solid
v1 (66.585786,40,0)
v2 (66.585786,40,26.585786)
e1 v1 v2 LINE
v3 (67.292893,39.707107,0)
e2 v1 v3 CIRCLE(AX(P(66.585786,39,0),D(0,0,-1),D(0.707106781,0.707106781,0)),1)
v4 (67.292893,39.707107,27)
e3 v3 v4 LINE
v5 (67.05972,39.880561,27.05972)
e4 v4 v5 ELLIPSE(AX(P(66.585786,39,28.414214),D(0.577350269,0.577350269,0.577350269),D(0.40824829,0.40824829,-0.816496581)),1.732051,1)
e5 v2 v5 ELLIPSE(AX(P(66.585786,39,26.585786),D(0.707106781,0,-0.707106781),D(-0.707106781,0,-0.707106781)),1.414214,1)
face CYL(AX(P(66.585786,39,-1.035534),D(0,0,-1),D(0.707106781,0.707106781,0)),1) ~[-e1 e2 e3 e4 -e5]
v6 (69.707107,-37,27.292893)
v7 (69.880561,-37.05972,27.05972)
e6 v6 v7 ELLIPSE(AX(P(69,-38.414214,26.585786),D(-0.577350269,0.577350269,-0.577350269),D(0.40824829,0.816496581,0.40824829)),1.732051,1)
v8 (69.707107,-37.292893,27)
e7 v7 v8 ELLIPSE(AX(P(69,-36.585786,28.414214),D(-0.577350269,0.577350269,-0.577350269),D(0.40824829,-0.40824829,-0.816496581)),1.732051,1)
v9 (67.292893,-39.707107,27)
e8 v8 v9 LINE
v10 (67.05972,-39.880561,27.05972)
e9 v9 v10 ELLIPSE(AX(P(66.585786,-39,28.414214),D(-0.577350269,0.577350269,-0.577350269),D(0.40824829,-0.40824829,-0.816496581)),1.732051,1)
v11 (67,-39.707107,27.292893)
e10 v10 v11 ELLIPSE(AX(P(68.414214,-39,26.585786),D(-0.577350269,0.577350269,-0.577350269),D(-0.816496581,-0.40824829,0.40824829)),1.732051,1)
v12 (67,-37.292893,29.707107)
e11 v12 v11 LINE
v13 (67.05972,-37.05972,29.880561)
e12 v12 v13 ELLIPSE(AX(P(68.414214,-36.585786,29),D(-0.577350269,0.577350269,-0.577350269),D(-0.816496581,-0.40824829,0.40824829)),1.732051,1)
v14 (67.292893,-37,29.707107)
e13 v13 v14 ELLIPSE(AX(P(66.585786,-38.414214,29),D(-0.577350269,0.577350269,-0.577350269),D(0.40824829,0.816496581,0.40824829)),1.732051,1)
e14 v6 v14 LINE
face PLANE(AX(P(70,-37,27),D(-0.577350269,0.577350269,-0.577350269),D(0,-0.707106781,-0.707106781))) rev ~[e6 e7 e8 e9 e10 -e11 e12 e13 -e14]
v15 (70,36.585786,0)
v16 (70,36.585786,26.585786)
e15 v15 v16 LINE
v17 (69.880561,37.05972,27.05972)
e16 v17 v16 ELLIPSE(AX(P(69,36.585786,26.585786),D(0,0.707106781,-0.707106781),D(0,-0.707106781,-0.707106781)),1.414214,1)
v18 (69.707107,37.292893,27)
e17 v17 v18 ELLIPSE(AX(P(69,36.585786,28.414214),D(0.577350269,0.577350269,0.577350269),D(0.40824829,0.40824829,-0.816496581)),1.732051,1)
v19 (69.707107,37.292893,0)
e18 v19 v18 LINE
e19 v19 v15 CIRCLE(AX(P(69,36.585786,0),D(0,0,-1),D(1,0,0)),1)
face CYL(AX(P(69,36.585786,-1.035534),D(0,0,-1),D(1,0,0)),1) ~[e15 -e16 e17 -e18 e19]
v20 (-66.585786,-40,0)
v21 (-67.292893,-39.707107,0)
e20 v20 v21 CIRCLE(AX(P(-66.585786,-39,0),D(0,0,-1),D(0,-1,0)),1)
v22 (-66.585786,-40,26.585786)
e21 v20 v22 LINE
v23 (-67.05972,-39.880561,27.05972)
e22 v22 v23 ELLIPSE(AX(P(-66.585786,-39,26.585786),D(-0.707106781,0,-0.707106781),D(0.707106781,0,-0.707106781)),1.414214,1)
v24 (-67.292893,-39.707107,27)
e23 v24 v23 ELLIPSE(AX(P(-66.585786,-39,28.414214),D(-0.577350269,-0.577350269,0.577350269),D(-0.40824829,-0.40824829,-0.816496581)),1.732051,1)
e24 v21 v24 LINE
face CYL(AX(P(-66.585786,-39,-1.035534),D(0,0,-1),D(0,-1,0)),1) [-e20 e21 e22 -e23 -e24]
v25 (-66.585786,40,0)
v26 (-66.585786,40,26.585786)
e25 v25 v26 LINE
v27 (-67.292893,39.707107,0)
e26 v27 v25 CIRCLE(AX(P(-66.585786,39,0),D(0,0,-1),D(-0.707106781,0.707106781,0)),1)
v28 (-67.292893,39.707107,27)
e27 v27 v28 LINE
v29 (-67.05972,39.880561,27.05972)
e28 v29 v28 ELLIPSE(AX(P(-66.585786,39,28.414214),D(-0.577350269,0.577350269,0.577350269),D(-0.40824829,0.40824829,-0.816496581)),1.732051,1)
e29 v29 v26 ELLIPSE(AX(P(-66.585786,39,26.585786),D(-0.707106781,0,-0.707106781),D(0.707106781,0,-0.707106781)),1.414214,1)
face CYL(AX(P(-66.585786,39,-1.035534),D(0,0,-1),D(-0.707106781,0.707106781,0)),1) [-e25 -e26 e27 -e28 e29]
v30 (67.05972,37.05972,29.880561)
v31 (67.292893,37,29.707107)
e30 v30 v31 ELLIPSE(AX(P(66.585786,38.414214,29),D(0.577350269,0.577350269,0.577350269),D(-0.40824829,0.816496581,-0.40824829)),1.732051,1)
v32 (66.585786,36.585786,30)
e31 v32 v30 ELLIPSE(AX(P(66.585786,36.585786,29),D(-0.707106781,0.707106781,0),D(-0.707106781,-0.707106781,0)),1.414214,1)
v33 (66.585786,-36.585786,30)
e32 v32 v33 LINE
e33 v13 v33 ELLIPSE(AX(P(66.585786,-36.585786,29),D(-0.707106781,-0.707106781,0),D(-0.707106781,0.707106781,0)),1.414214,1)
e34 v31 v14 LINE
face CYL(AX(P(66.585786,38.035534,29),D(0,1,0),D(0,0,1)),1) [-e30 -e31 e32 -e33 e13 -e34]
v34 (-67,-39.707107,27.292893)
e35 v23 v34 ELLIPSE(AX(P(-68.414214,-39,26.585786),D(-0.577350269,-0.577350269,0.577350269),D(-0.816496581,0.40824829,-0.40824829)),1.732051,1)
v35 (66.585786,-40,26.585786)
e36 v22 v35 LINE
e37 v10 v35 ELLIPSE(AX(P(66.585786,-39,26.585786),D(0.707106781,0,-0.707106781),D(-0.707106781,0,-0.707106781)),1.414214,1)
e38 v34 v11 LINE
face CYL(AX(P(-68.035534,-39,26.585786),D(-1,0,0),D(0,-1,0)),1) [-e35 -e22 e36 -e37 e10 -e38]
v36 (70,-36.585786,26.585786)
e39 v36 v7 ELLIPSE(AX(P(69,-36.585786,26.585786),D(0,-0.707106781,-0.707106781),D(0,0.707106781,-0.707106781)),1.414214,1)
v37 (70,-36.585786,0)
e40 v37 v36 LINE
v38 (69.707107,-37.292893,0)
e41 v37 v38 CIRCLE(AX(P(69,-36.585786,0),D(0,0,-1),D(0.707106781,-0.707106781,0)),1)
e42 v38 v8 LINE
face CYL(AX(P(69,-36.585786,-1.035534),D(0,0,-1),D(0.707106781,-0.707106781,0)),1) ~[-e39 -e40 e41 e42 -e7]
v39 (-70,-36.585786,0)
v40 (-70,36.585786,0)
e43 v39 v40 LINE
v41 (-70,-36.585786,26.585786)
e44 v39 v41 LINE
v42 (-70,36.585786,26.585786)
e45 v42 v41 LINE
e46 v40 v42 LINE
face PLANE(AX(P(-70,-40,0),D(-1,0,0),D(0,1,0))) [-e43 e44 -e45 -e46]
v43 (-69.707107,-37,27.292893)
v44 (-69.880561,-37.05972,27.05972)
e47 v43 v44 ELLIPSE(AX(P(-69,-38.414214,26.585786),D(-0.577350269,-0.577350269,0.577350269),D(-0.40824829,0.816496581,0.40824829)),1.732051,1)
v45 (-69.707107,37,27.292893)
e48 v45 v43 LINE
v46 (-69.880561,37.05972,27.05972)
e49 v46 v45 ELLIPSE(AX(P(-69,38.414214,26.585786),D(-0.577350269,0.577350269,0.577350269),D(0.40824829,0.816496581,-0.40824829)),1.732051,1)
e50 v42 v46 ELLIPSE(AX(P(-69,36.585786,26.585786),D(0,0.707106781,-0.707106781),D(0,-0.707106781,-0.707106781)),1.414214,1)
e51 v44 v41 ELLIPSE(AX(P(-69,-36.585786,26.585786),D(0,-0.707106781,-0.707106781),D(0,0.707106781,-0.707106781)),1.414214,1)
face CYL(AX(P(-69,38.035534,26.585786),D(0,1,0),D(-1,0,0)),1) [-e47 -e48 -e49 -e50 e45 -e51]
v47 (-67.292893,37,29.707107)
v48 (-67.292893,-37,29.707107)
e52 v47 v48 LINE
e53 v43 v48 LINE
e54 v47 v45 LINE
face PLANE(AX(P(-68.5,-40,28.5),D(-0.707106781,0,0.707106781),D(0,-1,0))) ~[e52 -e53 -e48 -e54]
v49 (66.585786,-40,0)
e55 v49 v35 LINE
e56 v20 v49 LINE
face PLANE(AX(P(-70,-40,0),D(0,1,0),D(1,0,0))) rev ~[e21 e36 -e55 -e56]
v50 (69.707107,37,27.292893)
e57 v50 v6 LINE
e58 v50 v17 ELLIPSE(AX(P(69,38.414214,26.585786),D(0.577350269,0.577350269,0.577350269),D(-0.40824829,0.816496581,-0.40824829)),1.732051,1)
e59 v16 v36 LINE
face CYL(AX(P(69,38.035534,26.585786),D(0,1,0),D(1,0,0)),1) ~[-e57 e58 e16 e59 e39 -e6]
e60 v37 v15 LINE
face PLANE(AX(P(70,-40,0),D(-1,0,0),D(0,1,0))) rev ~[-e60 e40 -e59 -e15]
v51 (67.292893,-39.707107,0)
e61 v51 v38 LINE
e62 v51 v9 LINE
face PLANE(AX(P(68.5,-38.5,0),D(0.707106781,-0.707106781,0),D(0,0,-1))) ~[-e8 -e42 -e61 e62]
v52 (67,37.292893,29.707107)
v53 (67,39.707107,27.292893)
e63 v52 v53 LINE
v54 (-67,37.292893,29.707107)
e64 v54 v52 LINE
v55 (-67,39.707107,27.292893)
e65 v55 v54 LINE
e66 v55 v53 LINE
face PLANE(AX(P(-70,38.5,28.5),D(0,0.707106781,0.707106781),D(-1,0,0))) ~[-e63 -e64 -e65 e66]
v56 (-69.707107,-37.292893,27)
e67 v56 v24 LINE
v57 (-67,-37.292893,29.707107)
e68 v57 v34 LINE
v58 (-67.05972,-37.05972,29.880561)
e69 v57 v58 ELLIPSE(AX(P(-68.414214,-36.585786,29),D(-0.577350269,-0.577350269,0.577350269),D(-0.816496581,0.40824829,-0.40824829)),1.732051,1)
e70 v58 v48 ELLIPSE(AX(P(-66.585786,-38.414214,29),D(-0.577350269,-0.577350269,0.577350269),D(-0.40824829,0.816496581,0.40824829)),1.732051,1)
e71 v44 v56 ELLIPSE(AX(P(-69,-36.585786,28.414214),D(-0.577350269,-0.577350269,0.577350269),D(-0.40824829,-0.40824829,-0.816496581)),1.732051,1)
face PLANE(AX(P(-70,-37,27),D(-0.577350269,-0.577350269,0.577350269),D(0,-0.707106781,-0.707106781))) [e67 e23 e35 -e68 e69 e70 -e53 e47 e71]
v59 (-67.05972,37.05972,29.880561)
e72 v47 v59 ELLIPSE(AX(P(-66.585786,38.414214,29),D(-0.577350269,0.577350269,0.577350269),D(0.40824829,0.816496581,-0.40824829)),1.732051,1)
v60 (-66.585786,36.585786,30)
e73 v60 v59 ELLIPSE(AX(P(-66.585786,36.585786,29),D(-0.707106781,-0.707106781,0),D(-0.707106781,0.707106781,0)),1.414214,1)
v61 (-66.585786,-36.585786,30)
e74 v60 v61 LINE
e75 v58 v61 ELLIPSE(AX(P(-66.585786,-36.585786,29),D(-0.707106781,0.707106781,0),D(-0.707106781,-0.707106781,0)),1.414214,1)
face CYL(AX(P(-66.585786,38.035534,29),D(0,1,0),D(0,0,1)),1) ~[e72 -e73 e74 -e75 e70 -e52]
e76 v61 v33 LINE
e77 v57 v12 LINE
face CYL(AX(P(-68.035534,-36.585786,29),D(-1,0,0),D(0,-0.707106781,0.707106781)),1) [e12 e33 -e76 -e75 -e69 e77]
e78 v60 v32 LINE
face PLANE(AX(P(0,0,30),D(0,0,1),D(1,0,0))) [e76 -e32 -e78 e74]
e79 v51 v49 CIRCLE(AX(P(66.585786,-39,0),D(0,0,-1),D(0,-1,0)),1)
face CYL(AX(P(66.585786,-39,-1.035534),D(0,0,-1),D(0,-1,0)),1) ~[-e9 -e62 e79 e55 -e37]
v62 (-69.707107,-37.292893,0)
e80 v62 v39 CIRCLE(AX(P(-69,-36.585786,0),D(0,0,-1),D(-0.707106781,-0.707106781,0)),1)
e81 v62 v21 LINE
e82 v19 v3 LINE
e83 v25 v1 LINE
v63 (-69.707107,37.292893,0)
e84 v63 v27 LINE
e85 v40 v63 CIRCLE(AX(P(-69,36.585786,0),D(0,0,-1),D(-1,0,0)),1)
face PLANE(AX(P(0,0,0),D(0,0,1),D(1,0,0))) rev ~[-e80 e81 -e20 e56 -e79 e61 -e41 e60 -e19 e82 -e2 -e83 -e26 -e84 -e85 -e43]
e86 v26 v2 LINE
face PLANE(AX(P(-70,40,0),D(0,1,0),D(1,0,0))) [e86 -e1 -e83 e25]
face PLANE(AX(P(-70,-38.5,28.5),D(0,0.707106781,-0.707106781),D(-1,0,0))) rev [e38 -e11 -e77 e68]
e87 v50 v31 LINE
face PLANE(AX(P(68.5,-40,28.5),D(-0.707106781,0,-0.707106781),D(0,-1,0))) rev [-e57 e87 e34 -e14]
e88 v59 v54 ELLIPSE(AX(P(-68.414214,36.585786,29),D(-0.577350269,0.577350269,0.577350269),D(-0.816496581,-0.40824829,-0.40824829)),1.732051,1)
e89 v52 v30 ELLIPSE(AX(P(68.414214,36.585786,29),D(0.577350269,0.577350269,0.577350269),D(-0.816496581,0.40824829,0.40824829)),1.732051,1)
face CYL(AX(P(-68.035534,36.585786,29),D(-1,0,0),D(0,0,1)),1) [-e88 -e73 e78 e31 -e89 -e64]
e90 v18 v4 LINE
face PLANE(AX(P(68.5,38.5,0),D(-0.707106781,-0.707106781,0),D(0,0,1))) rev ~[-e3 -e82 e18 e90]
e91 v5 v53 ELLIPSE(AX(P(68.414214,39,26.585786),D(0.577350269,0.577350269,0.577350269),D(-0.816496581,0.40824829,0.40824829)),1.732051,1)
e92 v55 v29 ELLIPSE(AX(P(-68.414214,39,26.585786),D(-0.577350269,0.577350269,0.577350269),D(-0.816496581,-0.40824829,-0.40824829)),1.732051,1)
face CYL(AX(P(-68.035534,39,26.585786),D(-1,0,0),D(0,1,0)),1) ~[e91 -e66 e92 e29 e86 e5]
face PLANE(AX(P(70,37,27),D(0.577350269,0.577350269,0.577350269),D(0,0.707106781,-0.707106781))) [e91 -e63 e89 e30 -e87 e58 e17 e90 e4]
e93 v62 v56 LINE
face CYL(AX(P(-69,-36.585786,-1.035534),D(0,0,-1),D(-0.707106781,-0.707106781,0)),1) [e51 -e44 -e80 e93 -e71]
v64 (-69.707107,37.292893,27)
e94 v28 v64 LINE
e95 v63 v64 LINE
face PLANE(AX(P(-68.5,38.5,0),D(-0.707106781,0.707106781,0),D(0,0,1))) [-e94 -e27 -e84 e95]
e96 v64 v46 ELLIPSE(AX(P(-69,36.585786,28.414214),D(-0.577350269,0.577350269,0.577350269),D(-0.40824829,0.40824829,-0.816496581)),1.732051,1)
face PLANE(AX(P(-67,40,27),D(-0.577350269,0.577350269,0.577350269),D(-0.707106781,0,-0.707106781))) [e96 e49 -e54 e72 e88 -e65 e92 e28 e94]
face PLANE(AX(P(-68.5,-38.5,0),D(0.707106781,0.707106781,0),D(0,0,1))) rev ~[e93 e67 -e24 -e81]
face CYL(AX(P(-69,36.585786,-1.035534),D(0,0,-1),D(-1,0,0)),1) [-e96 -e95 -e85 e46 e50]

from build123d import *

# Parameters (mm, degrees)
F0_W        = 140
F0_H        = 80
F1_DEPTH    = 30
F2_SIZE     = 3
F3_T1_DEPTH = 29.0710678119
F3_T3_DEPTH = 136.0710678119
F3_T5_DEPTH = 76.0710678119


# Not quite as in the source:
# - a fillet or chamfer that OpenCascade refuses, or shapes differently, is made with other operations: its cross-section is extruded or revolved along the edge and cut away or added


with BuildPart() as f1:
    # F0 (on Top) → F1 (new body)
    with BuildSketch(Plane.XY):
        Rectangle(F0_W, F0_H)
    extrude(amount=F1_DEPTH)

    # F2
    f2_edges = [f1.edges().sort_by_distance(p)[0] for p in [
        (0, -40, 30),
        (-70, 0, 30),
        (0, 40, 30),
        (70, 0, 30),
        (70, -40, 15),
        (-70, -40, 15),
        (-70, 40, 15),
        (70, 40, 15),
    ]]
    chamfer(f2_edges, length=F2_SIZE)

    # F3: fillet of radius 1 on 16 edges, made by hand

    # F3_s2 → F3_t1 (cut)
    with BuildSketch(Plane.XY.offset(-1.0355339059)):
        with BuildLine():
            ThreePointArc((70, 36.5857864376), (69.9238795325, 36.96846987), (69.7071067812, 37.2928932188))
            Line((69.7071067812, 37.2928932188), (70, 37))
            Line((70, 37), (70, 36.5857864376))
        make_face()
        with BuildLine():
            ThreePointArc((67.2928932188, 39.7071067812), (66.96846987, 39.9238795325), (66.5857864376, 40))
            Line((66.5857864376, 40), (67, 40))
            Line((67, 40), (67.2928932188, 39.7071067812))
        make_face()
        with BuildLine():
            ThreePointArc((-67.2928932188, 39.7071067812), (-66.96846987, 39.9238795325), (-66.5857864376, 40))
            Line((-66.5857864376, 40), (-67, 40))
            Line((-67, 40), (-67.2928932188, 39.7071067812))
        make_face()
        with BuildLine():
            ThreePointArc((-70, 36.5857864376), (-69.9238795325, 36.96846987), (-69.7071067812, 37.2928932188))
            Line((-69.7071067812, 37.2928932188), (-70, 37))
            Line((-70, 37), (-70, 36.5857864376))
        make_face()
        with BuildLine():
            ThreePointArc((69.7071067812, -37.2928932188), (69.9238795325, -36.96846987), (70, -36.5857864376))
            Line((70, -36.5857864376), (70, -37))
            Line((70, -37), (69.7071067812, -37.2928932188))
        make_face()
        with BuildLine():
            ThreePointArc((66.5857864376, -40), (66.96846987, -39.9238795325), (67.2928932188, -39.7071067812))
            Line((67.2928932188, -39.7071067812), (67, -40))
            Line((67, -40), (66.5857864376, -40))
        make_face()
        with BuildLine():
            ThreePointArc((-69.7071067812, -37.2928932188), (-69.9238795325, -36.96846987), (-70, -36.5857864376))
            Line((-70, -36.5857864376), (-70, -37))
            Line((-70, -37), (-69.7071067812, -37.2928932188))
        make_face()
        with BuildLine():
            ThreePointArc((-66.5857864376, -40), (-66.96846987, -39.9238795325), (-67.2928932188, -39.7071067812))
            Line((-67.2928932188, -39.7071067812), (-67, -40))
            Line((-67, -40), (-66.5857864376, -40))
        make_face()
    extrude(amount=F3_T1_DEPTH, mode=Mode.SUBTRACT)

    # F3_s4 → F3_t3 (cut)
    with BuildSketch(Plane.YZ.offset(-68.0355339059)):
        with BuildLine():
            ThreePointArc((40, 26.5857864376), (39.9238795325, 26.96846987), (39.7071067812, 27.2928932188))
            Line((39.7071067812, 27.2928932188), (40, 27))
            Line((40, 27), (40, 26.5857864376))
        make_face()
        with BuildLine():
            ThreePointArc((36.5857864376, 30), (36.96846987, 29.9238795325), (37.2928932188, 29.7071067812))
            Line((37.2928932188, 29.7071067812), (37, 30))
            Line((37, 30), (36.5857864376, 30))
        make_face()
        with BuildLine():
            ThreePointArc((-37.2928932188, 29.7071067812), (-36.96846987, 29.9238795325), (-36.5857864376, 30))
            Line((-36.5857864376, 30), (-37, 30))
            Line((-37, 30), (-37.2928932188, 29.7071067812))
        make_face()
        with BuildLine():
            ThreePointArc((-40, 26.5857864376), (-39.9238795325, 26.96846987), (-39.7071067812, 27.2928932188))
            Line((-39.7071067812, 27.2928932188), (-40, 27))
            Line((-40, 27), (-40, 26.5857864376))
        make_face()
    extrude(amount=F3_T3_DEPTH, mode=Mode.SUBTRACT)

    # F3_s6 → F3_t5 (cut)
    with BuildSketch(Plane.XZ.offset(-38.0355339059)):
        with BuildLine():
            ThreePointArc((66.5857864376, 30), (66.96846987, 29.9238795325), (67.2928932188, 29.7071067812))
            Line((67.2928932188, 29.7071067812), (67, 30))
            Line((67, 30), (66.5857864376, 30))
        make_face()
        with BuildLine():
            ThreePointArc((70, 26.5857864376), (69.9238795325, 26.96846987), (69.7071067812, 27.2928932188))
            Line((69.7071067812, 27.2928932188), (70, 27))
            Line((70, 27), (70, 26.5857864376))
        make_face()
        with BuildLine():
            ThreePointArc((-66.5857864376, 30), (-66.96846987, 29.9238795325), (-67.2928932188, 29.7071067812))
            Line((-67.2928932188, 29.7071067812), (-67, 30))
            Line((-67, 30), (-66.5857864376, 30))
        make_face()
        with BuildLine():
            ThreePointArc((-70, 26.5857864376), (-69.9238795325, 26.96846987), (-69.7071067812, 27.2928932188))
            Line((-69.7071067812, 27.2928932188), (-70, 27))
            Line((-70, 27), (-70, 26.5857864376))
        make_face()
    extrude(amount=F3_T5_DEPTH, mode=Mode.SUBTRACT)


solid = f1.part
